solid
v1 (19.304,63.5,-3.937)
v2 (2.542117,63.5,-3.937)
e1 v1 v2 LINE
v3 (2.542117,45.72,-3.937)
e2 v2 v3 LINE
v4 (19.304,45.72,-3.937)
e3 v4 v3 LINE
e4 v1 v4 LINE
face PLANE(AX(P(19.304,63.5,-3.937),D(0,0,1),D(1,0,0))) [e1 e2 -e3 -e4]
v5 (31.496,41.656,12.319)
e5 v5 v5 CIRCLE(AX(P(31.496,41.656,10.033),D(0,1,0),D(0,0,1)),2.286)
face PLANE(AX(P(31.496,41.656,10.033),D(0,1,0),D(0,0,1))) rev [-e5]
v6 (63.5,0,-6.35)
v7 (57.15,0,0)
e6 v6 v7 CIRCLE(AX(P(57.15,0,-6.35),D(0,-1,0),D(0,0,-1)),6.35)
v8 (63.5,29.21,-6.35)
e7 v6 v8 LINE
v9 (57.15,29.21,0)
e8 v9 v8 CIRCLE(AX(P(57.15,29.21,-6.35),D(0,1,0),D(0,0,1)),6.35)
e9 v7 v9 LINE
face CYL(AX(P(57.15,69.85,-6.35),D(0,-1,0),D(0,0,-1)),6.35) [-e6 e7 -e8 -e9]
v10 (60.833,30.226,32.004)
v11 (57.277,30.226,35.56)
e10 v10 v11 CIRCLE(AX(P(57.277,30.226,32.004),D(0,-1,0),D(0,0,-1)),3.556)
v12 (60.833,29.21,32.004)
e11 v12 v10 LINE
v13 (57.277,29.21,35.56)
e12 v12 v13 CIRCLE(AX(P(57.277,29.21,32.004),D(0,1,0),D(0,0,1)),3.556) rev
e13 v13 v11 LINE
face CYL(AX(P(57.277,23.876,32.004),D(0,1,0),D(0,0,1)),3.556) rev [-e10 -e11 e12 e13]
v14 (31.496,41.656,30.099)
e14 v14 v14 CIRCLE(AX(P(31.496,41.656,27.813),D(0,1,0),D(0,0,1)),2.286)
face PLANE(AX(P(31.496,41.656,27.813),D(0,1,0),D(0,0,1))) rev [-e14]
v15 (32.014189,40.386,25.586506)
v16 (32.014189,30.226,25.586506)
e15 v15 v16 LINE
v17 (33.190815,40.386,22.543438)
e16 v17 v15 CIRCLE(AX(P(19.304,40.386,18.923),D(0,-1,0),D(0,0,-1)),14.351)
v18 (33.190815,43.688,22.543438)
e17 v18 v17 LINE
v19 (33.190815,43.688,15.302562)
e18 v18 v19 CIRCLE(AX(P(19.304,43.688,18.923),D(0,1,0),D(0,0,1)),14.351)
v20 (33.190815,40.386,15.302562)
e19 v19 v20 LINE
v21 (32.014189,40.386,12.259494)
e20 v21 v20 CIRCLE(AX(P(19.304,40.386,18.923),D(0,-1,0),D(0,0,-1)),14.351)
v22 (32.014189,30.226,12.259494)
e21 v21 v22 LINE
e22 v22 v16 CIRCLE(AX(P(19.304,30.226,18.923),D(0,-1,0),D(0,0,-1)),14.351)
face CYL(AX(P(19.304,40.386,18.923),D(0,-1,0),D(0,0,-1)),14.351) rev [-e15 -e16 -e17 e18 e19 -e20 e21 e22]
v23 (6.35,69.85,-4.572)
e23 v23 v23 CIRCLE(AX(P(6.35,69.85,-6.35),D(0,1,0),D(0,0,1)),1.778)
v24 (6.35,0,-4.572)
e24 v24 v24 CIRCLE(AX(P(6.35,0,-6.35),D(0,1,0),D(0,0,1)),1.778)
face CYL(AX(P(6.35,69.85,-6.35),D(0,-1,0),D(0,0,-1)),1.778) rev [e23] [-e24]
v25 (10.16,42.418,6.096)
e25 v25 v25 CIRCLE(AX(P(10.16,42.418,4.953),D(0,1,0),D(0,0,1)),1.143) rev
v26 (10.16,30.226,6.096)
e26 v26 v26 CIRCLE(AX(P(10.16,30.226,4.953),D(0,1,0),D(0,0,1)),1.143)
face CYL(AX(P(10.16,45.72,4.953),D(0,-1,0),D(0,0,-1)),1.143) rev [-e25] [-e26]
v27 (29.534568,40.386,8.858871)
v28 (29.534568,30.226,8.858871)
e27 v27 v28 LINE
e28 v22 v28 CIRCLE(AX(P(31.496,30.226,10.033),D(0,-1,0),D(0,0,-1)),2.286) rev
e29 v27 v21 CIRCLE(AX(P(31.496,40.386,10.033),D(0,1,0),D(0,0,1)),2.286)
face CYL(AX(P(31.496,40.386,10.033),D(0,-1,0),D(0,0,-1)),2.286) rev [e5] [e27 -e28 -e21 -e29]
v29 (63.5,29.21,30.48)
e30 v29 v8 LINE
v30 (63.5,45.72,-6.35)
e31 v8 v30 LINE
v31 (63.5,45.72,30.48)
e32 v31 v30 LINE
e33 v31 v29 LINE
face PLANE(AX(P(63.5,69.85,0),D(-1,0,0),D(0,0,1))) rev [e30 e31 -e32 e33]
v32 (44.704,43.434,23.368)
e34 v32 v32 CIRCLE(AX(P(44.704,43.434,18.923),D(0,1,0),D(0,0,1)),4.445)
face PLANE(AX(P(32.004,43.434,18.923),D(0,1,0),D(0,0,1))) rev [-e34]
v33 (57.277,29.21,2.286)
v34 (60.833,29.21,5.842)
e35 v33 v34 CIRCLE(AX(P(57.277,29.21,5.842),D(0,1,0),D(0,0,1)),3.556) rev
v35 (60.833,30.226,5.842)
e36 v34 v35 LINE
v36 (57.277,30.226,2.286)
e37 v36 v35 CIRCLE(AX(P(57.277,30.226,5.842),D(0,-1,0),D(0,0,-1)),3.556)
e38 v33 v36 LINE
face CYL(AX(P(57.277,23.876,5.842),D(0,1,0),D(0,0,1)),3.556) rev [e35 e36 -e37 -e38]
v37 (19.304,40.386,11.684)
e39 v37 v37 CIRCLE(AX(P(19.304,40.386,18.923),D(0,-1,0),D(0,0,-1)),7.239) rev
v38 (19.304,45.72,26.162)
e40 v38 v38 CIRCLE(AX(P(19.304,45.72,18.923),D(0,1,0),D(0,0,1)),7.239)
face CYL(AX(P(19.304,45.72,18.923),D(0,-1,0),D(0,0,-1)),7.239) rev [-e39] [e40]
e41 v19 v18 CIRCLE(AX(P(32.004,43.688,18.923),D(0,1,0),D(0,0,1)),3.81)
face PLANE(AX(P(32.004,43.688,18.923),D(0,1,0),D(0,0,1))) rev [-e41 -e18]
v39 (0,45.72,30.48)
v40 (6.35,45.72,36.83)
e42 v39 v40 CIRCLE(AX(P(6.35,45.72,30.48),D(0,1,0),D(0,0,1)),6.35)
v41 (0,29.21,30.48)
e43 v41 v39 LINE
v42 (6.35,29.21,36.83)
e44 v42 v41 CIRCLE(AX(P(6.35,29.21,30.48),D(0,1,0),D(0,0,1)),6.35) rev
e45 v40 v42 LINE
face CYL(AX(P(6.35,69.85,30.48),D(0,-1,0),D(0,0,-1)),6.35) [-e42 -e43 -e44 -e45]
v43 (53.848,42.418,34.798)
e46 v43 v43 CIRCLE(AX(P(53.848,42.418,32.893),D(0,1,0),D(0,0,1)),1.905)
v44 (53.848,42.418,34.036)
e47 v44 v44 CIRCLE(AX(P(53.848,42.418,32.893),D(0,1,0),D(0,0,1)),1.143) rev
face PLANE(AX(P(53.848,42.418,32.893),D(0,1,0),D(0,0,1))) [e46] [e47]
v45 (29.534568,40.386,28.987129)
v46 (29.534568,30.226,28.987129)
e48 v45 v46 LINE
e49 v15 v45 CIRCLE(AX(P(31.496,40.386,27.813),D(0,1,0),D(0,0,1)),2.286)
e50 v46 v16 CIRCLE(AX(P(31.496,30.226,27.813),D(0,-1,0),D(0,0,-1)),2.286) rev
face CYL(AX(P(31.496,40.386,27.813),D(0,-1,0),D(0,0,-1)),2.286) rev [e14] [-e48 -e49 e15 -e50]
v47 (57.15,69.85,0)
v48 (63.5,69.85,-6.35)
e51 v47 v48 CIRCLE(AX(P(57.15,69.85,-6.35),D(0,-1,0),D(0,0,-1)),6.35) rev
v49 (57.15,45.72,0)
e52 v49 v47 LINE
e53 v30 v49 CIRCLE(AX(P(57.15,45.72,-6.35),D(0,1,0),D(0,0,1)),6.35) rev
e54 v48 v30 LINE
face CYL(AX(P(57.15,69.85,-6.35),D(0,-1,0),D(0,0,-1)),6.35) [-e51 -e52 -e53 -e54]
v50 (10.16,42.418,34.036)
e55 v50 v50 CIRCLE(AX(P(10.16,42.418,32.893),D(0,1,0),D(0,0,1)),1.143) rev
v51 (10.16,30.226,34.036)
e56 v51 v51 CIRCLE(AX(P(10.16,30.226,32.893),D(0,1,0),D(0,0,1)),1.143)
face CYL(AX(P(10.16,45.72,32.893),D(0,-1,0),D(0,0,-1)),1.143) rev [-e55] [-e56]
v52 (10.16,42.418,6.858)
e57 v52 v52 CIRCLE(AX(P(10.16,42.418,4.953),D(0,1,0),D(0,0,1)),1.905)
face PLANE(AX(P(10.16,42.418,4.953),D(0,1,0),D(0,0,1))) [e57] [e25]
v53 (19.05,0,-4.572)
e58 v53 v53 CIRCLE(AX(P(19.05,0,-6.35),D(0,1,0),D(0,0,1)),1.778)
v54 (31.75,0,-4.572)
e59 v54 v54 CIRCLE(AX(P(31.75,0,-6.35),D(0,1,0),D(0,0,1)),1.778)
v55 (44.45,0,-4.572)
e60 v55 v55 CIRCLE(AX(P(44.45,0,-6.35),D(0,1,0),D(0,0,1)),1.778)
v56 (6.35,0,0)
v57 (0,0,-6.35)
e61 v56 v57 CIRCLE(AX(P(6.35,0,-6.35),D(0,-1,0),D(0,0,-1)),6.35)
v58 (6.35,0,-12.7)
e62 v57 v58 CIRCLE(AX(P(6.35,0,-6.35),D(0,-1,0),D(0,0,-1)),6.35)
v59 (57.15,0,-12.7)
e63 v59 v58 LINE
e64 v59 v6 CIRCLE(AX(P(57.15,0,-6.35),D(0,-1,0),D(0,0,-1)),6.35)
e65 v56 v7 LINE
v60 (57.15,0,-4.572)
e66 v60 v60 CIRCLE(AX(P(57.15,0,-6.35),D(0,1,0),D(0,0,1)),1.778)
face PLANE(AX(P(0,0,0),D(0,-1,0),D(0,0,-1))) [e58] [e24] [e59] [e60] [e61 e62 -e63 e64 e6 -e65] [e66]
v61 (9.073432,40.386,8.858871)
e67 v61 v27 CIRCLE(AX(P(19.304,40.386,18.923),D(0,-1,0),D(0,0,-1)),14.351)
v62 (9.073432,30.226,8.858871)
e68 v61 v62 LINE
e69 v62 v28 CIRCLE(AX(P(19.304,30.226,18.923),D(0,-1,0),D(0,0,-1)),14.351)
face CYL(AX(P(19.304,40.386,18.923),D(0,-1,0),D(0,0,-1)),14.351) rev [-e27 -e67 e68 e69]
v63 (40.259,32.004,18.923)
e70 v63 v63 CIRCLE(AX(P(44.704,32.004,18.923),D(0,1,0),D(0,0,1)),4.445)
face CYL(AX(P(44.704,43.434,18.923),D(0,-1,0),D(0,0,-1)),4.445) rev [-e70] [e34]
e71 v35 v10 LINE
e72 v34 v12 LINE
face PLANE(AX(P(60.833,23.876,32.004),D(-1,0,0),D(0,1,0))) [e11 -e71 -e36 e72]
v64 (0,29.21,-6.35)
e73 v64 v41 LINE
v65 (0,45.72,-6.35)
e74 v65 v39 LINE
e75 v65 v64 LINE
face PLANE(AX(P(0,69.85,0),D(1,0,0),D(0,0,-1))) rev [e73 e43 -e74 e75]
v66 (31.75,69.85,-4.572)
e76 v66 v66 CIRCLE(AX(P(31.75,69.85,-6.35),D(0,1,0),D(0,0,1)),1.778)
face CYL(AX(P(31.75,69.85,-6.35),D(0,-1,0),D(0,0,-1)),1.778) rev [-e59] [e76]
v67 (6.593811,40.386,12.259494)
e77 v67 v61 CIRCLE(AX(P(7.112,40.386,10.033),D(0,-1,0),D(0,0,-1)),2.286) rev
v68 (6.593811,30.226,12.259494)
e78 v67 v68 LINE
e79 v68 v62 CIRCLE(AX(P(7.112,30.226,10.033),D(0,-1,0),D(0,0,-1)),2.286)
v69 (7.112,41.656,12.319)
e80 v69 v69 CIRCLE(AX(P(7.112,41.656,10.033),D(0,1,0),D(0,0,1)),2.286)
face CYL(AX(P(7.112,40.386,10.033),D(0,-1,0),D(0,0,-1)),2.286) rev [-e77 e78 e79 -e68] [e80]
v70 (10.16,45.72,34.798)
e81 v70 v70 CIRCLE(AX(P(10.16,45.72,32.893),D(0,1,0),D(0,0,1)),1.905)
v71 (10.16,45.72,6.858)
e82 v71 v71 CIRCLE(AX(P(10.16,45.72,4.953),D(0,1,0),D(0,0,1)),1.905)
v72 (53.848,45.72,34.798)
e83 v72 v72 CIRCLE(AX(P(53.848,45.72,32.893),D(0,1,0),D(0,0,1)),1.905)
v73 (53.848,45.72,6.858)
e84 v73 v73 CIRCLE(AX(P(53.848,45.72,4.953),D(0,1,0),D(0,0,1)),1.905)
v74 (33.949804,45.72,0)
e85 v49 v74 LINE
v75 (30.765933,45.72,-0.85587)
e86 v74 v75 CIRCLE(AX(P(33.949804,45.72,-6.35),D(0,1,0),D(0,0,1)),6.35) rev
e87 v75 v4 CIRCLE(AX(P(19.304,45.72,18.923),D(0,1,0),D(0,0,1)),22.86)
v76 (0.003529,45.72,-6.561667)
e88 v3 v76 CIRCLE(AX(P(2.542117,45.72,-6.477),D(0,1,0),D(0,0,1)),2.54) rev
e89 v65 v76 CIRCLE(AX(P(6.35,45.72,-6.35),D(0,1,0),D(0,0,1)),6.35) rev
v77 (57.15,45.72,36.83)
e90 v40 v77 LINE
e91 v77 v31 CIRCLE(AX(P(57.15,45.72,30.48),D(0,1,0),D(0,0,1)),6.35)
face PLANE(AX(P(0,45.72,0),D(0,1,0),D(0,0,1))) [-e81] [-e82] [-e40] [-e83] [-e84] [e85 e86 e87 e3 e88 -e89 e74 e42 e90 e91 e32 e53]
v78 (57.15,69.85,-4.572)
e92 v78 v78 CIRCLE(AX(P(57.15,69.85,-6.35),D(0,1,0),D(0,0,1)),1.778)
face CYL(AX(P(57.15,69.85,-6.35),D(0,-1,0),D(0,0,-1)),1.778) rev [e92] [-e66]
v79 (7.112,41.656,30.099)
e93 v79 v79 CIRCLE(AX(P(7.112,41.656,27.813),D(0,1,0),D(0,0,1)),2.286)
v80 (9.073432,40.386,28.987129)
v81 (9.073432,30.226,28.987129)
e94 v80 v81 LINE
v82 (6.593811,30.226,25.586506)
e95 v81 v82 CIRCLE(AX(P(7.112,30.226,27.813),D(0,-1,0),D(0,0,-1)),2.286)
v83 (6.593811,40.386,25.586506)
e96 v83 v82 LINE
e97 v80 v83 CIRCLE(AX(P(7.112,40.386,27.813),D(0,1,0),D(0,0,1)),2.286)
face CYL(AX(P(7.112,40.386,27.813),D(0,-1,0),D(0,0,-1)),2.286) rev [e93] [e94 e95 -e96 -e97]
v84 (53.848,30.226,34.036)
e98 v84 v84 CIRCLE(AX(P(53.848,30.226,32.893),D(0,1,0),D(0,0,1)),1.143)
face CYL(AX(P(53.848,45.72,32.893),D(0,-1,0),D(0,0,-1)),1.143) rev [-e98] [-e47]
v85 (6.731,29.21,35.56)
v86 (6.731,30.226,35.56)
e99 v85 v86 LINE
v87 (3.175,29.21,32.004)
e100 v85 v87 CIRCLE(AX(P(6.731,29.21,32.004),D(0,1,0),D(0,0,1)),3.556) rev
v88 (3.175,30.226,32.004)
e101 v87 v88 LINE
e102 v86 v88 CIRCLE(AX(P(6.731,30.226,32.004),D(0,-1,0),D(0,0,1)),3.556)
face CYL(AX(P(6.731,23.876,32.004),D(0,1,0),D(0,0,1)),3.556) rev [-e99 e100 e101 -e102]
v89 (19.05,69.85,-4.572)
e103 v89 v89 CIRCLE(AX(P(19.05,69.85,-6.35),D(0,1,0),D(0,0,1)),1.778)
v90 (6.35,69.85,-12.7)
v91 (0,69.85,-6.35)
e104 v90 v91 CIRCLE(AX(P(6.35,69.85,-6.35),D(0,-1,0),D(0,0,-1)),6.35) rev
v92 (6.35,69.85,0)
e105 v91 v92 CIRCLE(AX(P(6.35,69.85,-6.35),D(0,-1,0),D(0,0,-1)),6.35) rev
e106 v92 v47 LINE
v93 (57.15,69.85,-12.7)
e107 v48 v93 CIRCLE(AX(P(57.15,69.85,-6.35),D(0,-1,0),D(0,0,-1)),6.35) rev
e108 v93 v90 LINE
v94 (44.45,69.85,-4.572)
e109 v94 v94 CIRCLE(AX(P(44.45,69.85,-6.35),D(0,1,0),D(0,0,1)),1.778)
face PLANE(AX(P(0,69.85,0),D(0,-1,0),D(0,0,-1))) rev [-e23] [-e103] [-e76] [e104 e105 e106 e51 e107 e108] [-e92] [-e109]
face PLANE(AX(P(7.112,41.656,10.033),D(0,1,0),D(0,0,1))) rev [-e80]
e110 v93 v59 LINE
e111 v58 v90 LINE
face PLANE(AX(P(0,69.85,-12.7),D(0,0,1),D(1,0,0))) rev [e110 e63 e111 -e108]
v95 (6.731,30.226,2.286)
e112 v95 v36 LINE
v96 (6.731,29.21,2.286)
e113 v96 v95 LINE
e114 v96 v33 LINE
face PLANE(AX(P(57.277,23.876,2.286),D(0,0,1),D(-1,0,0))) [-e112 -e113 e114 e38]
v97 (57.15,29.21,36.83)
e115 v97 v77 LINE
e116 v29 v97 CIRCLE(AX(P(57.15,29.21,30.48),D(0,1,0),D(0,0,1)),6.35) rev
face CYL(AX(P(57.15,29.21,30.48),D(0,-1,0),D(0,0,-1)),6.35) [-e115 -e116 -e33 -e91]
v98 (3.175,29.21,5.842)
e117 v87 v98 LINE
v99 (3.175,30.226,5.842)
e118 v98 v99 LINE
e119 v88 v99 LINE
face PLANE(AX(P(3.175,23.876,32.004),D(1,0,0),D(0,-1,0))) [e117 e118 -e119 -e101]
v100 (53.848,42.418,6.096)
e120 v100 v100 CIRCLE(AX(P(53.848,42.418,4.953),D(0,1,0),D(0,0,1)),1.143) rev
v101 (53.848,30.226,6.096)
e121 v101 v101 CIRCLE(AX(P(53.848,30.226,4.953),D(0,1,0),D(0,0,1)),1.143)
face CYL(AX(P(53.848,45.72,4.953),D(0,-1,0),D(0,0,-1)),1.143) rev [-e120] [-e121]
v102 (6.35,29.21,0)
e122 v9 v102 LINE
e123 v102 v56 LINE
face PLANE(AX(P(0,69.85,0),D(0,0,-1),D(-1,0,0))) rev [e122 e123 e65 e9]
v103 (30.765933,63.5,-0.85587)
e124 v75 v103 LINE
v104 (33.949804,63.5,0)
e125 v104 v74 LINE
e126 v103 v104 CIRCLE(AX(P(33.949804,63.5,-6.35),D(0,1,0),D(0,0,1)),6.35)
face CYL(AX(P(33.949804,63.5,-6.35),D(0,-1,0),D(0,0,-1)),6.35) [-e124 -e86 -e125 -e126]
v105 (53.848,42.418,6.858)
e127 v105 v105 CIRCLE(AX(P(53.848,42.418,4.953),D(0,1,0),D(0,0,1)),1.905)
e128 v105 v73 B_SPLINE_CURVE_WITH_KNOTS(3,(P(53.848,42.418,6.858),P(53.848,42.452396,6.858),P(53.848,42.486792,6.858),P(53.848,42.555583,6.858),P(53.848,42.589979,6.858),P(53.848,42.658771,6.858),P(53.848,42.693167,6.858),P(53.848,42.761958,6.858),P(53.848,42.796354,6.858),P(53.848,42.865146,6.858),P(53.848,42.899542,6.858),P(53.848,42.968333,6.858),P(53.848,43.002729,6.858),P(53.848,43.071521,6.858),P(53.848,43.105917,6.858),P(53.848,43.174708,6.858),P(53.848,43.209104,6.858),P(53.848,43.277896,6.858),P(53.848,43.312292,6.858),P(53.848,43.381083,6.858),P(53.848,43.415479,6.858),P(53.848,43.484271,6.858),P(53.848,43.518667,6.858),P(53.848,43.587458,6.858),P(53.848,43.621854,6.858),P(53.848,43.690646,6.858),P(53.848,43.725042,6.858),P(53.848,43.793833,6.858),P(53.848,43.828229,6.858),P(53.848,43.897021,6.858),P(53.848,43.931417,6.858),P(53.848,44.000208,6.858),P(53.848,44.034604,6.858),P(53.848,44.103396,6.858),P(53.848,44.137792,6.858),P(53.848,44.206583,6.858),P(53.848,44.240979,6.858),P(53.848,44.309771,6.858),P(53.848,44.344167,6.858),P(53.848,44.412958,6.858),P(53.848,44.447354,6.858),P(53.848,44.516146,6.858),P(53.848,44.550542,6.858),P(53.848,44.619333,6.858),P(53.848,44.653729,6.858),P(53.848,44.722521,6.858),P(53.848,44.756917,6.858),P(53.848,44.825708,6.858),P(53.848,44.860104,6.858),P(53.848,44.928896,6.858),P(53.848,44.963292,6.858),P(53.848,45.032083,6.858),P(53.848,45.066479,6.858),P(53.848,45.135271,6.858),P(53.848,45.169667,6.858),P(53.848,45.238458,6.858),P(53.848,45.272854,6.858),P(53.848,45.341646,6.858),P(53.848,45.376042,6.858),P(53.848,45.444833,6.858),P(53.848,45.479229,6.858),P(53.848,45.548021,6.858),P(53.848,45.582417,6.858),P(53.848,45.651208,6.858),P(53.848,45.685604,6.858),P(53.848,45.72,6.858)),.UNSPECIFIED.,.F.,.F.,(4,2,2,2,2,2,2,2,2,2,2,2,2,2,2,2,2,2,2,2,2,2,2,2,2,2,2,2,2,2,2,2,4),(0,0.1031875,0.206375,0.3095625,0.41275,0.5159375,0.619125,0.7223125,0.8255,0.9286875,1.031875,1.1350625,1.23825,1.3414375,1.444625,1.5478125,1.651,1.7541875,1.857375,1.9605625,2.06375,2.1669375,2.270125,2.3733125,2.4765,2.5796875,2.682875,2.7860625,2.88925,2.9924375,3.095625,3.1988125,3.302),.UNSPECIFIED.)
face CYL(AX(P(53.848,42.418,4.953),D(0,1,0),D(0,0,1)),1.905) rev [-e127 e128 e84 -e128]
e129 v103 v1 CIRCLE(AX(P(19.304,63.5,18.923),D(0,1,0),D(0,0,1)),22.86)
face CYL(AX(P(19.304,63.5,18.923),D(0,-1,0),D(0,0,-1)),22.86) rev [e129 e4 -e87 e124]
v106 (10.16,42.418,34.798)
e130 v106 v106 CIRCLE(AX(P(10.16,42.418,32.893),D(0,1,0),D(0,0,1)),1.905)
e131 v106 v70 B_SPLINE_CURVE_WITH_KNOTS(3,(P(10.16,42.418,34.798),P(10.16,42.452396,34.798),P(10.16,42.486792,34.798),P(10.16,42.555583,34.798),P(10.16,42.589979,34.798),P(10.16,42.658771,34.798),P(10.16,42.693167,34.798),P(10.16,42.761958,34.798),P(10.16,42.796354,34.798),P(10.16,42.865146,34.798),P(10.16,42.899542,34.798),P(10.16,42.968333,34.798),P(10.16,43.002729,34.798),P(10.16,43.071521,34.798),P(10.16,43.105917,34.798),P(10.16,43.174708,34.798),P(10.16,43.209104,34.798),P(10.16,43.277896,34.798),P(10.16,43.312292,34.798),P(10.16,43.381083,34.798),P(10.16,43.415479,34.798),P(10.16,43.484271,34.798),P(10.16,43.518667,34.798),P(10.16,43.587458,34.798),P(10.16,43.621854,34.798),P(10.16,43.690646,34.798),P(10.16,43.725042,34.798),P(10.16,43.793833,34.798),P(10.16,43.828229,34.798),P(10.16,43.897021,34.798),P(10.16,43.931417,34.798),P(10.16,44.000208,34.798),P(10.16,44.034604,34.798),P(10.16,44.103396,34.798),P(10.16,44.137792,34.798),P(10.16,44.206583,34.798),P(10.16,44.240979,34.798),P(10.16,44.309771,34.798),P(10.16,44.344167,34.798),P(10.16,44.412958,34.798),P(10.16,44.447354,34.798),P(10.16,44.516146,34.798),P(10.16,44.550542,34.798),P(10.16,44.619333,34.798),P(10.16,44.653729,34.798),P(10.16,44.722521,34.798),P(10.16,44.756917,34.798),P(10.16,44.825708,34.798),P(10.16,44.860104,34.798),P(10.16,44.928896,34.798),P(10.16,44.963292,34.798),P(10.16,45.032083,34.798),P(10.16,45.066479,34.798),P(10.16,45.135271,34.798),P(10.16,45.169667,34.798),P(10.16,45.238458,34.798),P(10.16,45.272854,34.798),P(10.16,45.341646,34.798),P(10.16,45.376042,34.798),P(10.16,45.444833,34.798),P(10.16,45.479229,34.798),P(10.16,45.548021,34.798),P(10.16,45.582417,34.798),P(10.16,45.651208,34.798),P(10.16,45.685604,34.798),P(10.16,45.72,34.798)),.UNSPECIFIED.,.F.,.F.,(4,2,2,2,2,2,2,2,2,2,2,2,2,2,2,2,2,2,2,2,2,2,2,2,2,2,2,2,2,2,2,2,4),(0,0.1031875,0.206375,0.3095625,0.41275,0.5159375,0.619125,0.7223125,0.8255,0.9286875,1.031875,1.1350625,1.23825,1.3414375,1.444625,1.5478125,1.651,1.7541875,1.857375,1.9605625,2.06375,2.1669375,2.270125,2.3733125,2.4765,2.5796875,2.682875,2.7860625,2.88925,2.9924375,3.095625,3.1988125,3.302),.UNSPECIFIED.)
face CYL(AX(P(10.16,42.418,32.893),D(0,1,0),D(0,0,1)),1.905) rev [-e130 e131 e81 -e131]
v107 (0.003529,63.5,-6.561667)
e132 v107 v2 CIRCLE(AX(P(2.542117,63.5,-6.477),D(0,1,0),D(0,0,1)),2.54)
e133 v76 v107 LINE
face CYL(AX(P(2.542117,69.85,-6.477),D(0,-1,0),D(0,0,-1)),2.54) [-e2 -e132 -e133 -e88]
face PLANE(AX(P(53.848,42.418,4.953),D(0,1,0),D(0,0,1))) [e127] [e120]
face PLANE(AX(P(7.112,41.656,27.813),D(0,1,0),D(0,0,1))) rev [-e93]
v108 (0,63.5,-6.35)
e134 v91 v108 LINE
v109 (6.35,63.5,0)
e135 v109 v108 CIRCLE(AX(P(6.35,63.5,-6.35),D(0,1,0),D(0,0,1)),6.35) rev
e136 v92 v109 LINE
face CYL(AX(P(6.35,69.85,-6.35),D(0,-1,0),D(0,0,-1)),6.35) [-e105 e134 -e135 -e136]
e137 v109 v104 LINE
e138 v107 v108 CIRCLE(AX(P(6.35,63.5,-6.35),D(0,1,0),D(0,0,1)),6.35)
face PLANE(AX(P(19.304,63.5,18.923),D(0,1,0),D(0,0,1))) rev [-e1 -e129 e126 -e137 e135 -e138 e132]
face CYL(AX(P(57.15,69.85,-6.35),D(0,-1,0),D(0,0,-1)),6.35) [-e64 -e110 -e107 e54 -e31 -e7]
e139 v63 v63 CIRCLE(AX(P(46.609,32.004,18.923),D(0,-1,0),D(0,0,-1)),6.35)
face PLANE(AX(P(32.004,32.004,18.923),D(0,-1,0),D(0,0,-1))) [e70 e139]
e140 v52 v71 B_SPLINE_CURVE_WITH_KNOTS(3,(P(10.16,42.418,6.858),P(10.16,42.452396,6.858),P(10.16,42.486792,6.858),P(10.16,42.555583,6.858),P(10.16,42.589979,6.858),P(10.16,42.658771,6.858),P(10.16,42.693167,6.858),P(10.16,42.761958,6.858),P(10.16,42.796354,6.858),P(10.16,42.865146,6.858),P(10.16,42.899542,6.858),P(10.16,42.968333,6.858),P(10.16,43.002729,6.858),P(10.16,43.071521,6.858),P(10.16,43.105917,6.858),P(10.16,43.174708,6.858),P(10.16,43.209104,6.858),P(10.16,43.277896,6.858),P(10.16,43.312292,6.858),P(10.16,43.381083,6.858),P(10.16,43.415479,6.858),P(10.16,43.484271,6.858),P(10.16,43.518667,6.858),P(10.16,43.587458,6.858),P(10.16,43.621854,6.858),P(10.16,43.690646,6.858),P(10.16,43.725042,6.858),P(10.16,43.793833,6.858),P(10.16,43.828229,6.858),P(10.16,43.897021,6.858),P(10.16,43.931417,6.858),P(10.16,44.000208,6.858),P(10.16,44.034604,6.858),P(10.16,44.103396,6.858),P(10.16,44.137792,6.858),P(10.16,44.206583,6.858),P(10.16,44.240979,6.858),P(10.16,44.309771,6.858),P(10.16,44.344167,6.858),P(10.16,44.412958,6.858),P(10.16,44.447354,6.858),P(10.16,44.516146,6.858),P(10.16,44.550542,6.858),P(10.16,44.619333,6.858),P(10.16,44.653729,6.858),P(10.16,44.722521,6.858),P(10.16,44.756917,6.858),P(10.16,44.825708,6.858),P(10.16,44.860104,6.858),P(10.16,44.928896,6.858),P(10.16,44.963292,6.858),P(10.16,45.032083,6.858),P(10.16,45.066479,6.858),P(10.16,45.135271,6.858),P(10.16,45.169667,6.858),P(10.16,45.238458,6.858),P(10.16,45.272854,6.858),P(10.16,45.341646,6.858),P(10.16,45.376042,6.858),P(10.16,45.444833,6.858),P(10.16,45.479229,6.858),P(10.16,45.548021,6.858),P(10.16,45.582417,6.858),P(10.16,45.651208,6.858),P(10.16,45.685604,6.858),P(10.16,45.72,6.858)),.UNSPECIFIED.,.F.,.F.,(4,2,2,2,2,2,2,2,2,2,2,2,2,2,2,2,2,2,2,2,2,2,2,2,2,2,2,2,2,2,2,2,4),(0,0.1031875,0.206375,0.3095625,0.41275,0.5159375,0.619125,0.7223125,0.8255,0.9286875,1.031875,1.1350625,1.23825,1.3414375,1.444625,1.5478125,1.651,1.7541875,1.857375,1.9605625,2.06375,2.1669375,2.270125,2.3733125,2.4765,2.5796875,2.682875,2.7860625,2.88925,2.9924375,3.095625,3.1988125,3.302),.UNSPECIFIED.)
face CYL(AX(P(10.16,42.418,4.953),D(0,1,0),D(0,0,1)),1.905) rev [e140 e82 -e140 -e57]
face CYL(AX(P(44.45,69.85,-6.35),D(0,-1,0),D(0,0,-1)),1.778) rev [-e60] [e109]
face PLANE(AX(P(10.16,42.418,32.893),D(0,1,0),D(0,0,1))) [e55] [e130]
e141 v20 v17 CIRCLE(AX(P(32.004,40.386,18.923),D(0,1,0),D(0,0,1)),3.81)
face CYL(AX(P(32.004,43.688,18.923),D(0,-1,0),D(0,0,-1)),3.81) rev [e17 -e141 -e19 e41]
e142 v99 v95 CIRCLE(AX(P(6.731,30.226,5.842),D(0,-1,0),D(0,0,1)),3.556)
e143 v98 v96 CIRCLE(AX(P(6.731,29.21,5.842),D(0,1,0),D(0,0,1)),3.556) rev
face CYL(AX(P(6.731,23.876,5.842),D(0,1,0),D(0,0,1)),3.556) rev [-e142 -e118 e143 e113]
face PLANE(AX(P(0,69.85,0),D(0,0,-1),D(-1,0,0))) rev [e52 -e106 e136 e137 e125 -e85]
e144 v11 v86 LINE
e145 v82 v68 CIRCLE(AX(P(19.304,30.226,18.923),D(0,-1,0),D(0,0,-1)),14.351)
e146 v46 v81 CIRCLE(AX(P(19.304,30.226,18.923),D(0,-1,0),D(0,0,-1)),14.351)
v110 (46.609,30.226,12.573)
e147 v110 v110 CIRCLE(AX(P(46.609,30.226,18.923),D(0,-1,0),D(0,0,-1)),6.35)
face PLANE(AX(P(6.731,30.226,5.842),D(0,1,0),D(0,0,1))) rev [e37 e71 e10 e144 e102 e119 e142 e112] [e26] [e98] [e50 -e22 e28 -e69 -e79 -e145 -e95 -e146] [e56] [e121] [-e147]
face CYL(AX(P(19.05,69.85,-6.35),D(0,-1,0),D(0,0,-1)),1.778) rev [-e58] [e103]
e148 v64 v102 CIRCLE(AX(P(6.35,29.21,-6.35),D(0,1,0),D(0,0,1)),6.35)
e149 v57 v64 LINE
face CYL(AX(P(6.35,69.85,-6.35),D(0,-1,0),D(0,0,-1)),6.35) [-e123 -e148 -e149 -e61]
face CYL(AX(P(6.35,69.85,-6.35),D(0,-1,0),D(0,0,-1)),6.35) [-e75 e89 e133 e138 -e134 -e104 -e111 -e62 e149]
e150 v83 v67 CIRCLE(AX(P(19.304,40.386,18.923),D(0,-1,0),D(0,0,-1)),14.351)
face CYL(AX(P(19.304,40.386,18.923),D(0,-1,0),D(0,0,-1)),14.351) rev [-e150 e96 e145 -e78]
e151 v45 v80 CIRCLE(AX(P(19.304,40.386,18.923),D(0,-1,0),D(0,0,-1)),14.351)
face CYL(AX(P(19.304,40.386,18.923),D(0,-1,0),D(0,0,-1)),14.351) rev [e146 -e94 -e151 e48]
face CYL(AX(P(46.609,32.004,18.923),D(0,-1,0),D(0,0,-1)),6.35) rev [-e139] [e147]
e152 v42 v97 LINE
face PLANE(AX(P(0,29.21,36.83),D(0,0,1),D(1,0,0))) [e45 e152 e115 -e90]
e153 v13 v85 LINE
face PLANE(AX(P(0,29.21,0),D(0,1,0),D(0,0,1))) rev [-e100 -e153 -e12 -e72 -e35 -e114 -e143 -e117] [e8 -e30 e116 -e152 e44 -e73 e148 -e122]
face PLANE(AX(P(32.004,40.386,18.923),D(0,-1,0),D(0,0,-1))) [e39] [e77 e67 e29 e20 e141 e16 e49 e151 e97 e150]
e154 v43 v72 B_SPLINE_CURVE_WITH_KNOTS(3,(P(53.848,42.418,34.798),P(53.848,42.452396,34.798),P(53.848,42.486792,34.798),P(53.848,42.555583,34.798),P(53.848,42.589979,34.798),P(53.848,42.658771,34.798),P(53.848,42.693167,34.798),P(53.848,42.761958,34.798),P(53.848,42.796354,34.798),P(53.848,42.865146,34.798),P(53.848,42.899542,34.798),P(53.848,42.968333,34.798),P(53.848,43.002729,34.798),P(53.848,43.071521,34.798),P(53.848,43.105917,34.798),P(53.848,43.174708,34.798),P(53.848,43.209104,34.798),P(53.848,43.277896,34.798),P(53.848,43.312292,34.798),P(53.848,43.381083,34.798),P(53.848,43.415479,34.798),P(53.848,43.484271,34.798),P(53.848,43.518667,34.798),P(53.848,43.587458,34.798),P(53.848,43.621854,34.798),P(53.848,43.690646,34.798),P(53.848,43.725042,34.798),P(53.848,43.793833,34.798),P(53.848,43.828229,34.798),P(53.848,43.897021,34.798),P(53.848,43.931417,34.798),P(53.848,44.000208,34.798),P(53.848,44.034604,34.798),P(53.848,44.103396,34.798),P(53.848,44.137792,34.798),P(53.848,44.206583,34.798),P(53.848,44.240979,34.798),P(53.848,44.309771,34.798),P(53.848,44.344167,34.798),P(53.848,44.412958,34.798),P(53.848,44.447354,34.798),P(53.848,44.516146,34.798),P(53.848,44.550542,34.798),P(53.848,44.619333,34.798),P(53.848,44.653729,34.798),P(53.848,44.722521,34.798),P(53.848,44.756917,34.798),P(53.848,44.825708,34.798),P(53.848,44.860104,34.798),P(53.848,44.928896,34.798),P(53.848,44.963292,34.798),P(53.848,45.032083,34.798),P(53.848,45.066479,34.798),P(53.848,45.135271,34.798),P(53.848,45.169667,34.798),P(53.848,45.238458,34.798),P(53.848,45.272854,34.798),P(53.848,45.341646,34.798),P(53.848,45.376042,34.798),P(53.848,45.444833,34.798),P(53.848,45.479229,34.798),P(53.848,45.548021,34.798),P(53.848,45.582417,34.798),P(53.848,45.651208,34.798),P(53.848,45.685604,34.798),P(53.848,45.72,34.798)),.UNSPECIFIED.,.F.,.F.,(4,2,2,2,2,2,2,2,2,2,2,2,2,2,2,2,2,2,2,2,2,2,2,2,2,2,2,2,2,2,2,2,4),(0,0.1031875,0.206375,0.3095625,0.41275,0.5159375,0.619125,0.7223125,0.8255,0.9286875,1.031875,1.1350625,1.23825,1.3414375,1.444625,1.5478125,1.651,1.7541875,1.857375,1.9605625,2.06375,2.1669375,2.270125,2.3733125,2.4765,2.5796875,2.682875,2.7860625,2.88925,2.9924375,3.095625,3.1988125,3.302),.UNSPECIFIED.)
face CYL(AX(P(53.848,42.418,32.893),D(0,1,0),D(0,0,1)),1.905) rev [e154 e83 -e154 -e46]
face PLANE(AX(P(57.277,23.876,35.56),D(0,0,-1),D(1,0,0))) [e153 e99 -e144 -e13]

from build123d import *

# Parameters (mm, degrees)
SKETCH1_W             = 63.5
SKETCH1_H             = 12.7
SKETCH1_R             = 1.778
BOSS_EXTRUDE1_DEPTH   = 69.85
SKETCH2_W             = 63.5
SKETCH2_H             = 36.83
BOSS_EXTRUDE2_DEPTH   = 16.51
CAVITY1_START         = 29.21
CAVITY1_OUTLINE_R     = 1.143
CAVITY1_OUTLINE_R_2   = 4.445
CAVITY1_DEPTH         = 11.176
CAVITY1_2_OUTLINE_R   = 1.143
CAVITY1_2_OUTLINE_R_2 = 4.445
CAVITY1_2_DEPTH       = 1.016
CAVITY1_START_2       = 40.386
CAVITY1_3_OUTLINE_R   = 1.143
CAVITY1_3_OUTLINE_R_2 = 7.239
CAVITY1_3_DEPTH       = 5.334
CAVITY1_4_OUTLINE_R   = 4.445
CAVITY1_4_DEPTH       = 3.048
CAVITY1_START_3       = 30.226
CAVITY1_5_DEPTH       = 1.778
CAVITY1_START_4       = 42.418
CAVITY1_6_OUTLINE_R   = 1.905
CAVITY1_6_OUTLINE_R_2 = 1.143
CAVITY1_6_DEPTH       = 3.302
CAVITY1_7_OUTLINE_R   = 2.286
CAVITY1_7_DEPTH       = 1.27
CAVITY1_START_5       = 43.434
CAVITY1_8_DEPTH       = 0.254
CUT_EXTRUDE1_DEPTH    = 17.78
FILLET1_START         = -1
FILLET1_DEPTH         = 72
FILLET1_2_DEPTH       = 30.21
FILLET1_START_2       = 45.72
FILLET1_3_DEPTH       = 25.28
FILLET1_4_DEPTH       = 17.78
FILLET2_R             = 2.54


with BuildPart() as part:
    # Sketch1 → Boss-Extrude1 (new body)
    with BuildSketch(Plane(origin=(0, 0, 0), x_dir=(1, 0, 0), z_dir=(0, 1, 0))):
        with Locations((31.75, 6.35)):
            Rectangle(SKETCH1_W, SKETCH1_H)
        with Locations(Location((6.35, 6.35, 0), (0, 0, 270))):
            Circle(SKETCH1_R, mode=Mode.SUBTRACT)
        with Locations(Location((19.05, 6.35, 0), (0, 0, 270))):
            Circle(SKETCH1_R, mode=Mode.SUBTRACT)
        with Locations(Location((31.75, 6.35, 0), (0, 0, 270))):
            Circle(SKETCH1_R, mode=Mode.SUBTRACT)
        with Locations(Location((44.45, 6.35, 0), (0, 0, 270))):
            Circle(SKETCH1_R, mode=Mode.SUBTRACT)
        with Locations(Location((57.15, 6.35, 0), (0, 0, 270))):
            Circle(SKETCH1_R, mode=Mode.SUBTRACT)
    extrude(amount=BOSS_EXTRUDE1_DEPTH)

    # Sketch2 → Boss-Extrude2 (add)
    with BuildSketch(Plane(origin=(0, 45.72, 0), x_dir=(1, 0, 0), z_dir=(0, 1, 0))):
        with Locations((31.75, -18.415)):
            Rectangle(SKETCH2_W, SKETCH2_H)
    extrude(amount=-BOSS_EXTRUDE2_DEPTH)

    # Cavity1: read off the stored shape, not the designer's step
    # Cavity1 outline → Cavity1 (cut)
    with BuildSketch(Plane(origin=(0, 0, 0), x_dir=(1, 0, 0), z_dir=(0, 1, 0)).offset(CAVITY1_START)):
        with BuildLine():
            ThreePointArc((6.593811482, -12.259494253), (4.953, -18.923), (6.593811482, -25.586505747))
            ThreePointArc((6.593811482, -25.586505747), (5.264894786, -29.159847552), (9.073432496, -28.987128852))
            ThreePointArc((9.073432496, -28.987128852), (19.304, -33.274), (29.534567504, -28.987128852))
            ThreePointArc((29.534567504, -28.987128852), (33.343105214, -29.159847552), (32.014188518, -25.586505747))
            ThreePointArc((32.014188518, -25.586505747), (33.655, -18.923), (32.014188518, -12.259494253))
            ThreePointArc((32.014188518, -12.259494253), (33.343105214, -8.686152448), (29.534567504, -8.858871148))
            ThreePointArc((29.534567504, -8.858871148), (19.304, -4.572), (9.073432496, -8.858871148))
            ThreePointArc((9.073432496, -8.858871148), (5.264894786, -8.686152448), (6.593811482, -12.259494253))
        make_face()
        with Locations((10.16, -4.953)):
            Circle(CAVITY1_OUTLINE_R)
        with Locations((53.848, -4.953)):
            Circle(CAVITY1_OUTLINE_R)
        with Locations((10.16, -32.893)):
            Circle(CAVITY1_OUTLINE_R)
        with Locations((44.704, -18.923)):
            Circle(CAVITY1_OUTLINE_R_2)
        with Locations((53.848, -32.893)):
            Circle(CAVITY1_OUTLINE_R)
    extrude(amount=CAVITY1_DEPTH, mode=Mode.SUBTRACT)

    # Cavity1 2 outline → Cavity1 2 (cut)
    with BuildSketch(Plane(origin=(0, 0, 0), x_dir=(1, 0, 0), z_dir=(0, 1, 0)).offset(CAVITY1_START)):
        with BuildLine():
            ThreePointArc((6.731, -2.286), (4.216528286, -3.327528286), (3.175, -5.842))
            Line((3.175, -5.842), (3.175, -32.004))
            ThreePointArc((3.175, -32.004), (4.216528286, -34.518471714), (6.731, -35.56))
            Line((6.731, -35.56), (57.277, -35.56))
            ThreePointArc((57.277, -35.56), (59.791471714, -34.518471714), (60.833, -32.004))
            Line((60.833, -32.004), (60.833, -5.842))
            ThreePointArc((60.833, -5.842), (59.791471714, -3.327528286), (57.277, -2.286))
            Line((57.277, -2.286), (6.731, -2.286))
        make_face()
        with BuildLine():
            ThreePointArc((9.073432496, -8.858871148), (19.304, -4.572), (29.534567504, -8.858871148))
            ThreePointArc((29.534567504, -8.858871148), (33.343105214, -8.686152448), (32.014188518, -12.259494253))
            ThreePointArc((32.014188518, -12.259494253), (33.655, -18.923), (32.014188518, -25.586505747))
            ThreePointArc((32.014188518, -25.586505747), (33.343105214, -29.159847552), (29.534567504, -28.987128852))
            ThreePointArc((29.534567504, -28.987128852), (19.304, -33.274), (9.073432496, -28.987128852))
            ThreePointArc((9.073432496, -28.987128852), (5.264894786, -29.159847552), (6.593811482, -25.586505747))
            ThreePointArc((6.593811482, -25.586505747), (4.953, -18.923), (6.593811482, -12.259494253))
            ThreePointArc((6.593811482, -12.259494253), (5.264894786, -8.686152448), (9.073432496, -8.858871148))
        make_face(mode=Mode.SUBTRACT)
        with Locations((10.16, -4.953)):
            Circle(CAVITY1_2_OUTLINE_R, mode=Mode.SUBTRACT)
        with Locations((53.848, -4.953)):
            Circle(CAVITY1_2_OUTLINE_R, mode=Mode.SUBTRACT)
        with Locations((44.704, -18.923)):
            Circle(CAVITY1_2_OUTLINE_R_2, mode=Mode.SUBTRACT)
        with Locations((10.16, -32.893)):
            Circle(CAVITY1_2_OUTLINE_R, mode=Mode.SUBTRACT)
        with Locations((53.848, -32.893)):
            Circle(CAVITY1_2_OUTLINE_R, mode=Mode.SUBTRACT)
    extrude(amount=CAVITY1_2_DEPTH, mode=Mode.SUBTRACT)

    # Cavity1 3 outline → Cavity1 3 (cut)
    with BuildSketch(Plane(origin=(0, 0, 0), x_dir=(1, 0, 0), z_dir=(0, 1, 0)).offset(CAVITY1_START_2)):
        with Locations((10.16, -4.953)):
            Circle(CAVITY1_3_OUTLINE_R)
        with Locations((53.848, -4.953)):
            Circle(CAVITY1_3_OUTLINE_R)
        with Locations((10.16, -32.893)):
            Circle(CAVITY1_3_OUTLINE_R)
        with Locations((53.848, -32.893)):
            Circle(CAVITY1_3_OUTLINE_R)
        with Locations((19.304, -18.923)):
            Circle(CAVITY1_3_OUTLINE_R_2)
    extrude(amount=CAVITY1_3_DEPTH, mode=Mode.SUBTRACT)

    # Cavity1 4 outline → Cavity1 4 (cut)
    with BuildSketch(Plane(origin=(0, 0, 0), x_dir=(1, 0, 0), z_dir=(0, 1, 0)).offset(CAVITY1_START_2)):
        with BuildLine():
            ThreePointArc((33.190815, -22.54343784), (33.655, -18.923), (33.190815, -15.30256216))
            ThreePointArc((33.190815, -15.30256216), (28.194, -18.923), (33.190815, -22.54343784))
        make_face()
        with Locations((44.704, -18.923)):
            Circle(CAVITY1_4_OUTLINE_R)
    extrude(amount=CAVITY1_4_DEPTH, mode=Mode.SUBTRACT)

    # Cavity1 5 outline → Cavity1 5 (cut)
    with BuildSketch(Plane(origin=(0, 0, 0), x_dir=(1, 0, 0), z_dir=(0, 1, 0)).offset(CAVITY1_START_3)):
        with BuildLine():
            Line((43.693058667, -14.594487251), (45.602725966, -12.653238237))
            ThreePointArc((45.602725966, -12.653238237), (42.21166679, -14.341956381), (40.385648336, -17.661099029))
            Line((40.385648336, -17.661099029), (40.436941907, -17.677913564))
            ThreePointArc((40.436941907, -17.677913564), (41.647662495, -15.695489185), (43.693058667, -14.594487251))
        make_face()
        with BuildLine():
            ThreePointArc((52.371669641, -16.255765737), (49.592349777, -13.317455949), (45.602725966, -12.653238237))
            Line((45.602725966, -12.653238237), (43.693058667, -14.594487251))
            ThreePointArc((43.693058667, -14.594487251), (46.8188806, -15.013357427), (48.880068942, -17.40034666))
            Line((48.880068942, -17.40034666), (52.371669641, -16.255765737))
        make_face()
        with BuildLine():
            ThreePointArc((52.959, -18.923), (52.81042936, -17.557432759), (52.371669641, -16.255765737))
            Line((52.371669641, -16.255765737), (48.880068942, -17.40034666))
            ThreePointArc((48.880068942, -17.40034666), (49.081250932, -18.149889868), (49.149, -18.923))
            ThreePointArc((49.149, -18.923), (49.081250932, -19.696110132), (48.880068942, -20.44565334))
            Line((48.880068942, -20.44565334), (52.371669641, -21.590234263))
            ThreePointArc((52.371669641, -21.590234263), (52.81042936, -20.288567241), (52.959, -18.923))
        make_face()
        with BuildLine():
            Line((40.436941907, -17.677913564), (40.385648336, -17.661099029))
            ThreePointArc((40.385648336, -17.661099029), (40.35204351, -17.839950842), (40.323577582, -18.019692174))
            Line((40.323577582, -18.019692174), (40.359488936, -17.983186925))
            ThreePointArc((40.359488936, -17.983186925), (40.395510846, -17.829864048), (40.436941907, -17.677913564))
        make_face()
        with BuildLine():
            ThreePointArc((45.602725967, -25.192761763), (49.592349777, -24.528544051), (52.371669641, -21.590234263))
            Line((52.371669641, -21.590234263), (48.880068942, -20.44565334))
            ThreePointArc((48.880068942, -20.44565334), (46.8188806, -22.832642573), (43.693058668, -23.25151275))
            Line((43.693058668, -23.25151275), (45.602725967, -25.192761763))
        make_face()
        with BuildLine():
            Line((40.359488936, -17.983186925), (40.323577582, -18.019692174))
            ThreePointArc((40.323577582, -18.019692174), (40.275164971, -18.470193393), (40.259, -18.923))
            ThreePointArc((40.259, -18.923), (40.284193631, -18.450414917), (40.359488936, -17.983186925))
        make_face()
        with BuildLine():
            Line((40.359488936, -19.862813075), (40.323577582, -19.826307826))
            ThreePointArc((40.323577582, -19.826307826), (40.35204351, -20.006049158), (40.385648336, -20.184900971))
            Line((40.385648336, -20.184900971), (40.436941907, -20.168086436))
            ThreePointArc((40.436941907, -20.168086436), (40.395510846, -20.016135951), (40.359488936, -19.862813075))
        make_face()
        with BuildLine():
            ThreePointArc((40.259, -18.923), (40.275164971, -19.375806607), (40.323577582, -19.826307826))
            Line((40.323577582, -19.826307826), (40.359488936, -19.862813075))
            ThreePointArc((40.359488936, -19.862813075), (40.284193631, -19.395585083), (40.259, -18.923))
        make_face()
        with BuildLine():
            ThreePointArc((40.385648336, -20.184900971), (42.21166679, -23.504043619), (45.602725967, -25.192761763))
            Line((45.602725967, -25.192761763), (43.693058668, -23.25151275))
            ThreePointArc((43.693058668, -23.25151275), (41.647662496, -22.150510815), (40.436941907, -20.168086436))
            Line((40.436941907, -20.168086436), (40.385648336, -20.184900971))
        make_face()
    extrude(amount=CAVITY1_5_DEPTH, mode=Mode.SUBTRACT)

    # Cavity1 6 outline → Cavity1 6 (cut)
    # profile 1 of 4: a face of its own
    with BuildSketch(Plane(origin=(0, 0, 0), x_dir=(1, 0, 0), z_dir=(0, 1, 0)).offset(CAVITY1_START_4)):
        with Locations((10.16, -4.953)):
            Circle(CAVITY1_6_OUTLINE_R)
        with Locations((10.16, -4.953)):
            Circle(CAVITY1_6_OUTLINE_R_2, mode=Mode.SUBTRACT)
    # profile 2 of 4: a face of its own
    with BuildSketch(Plane(origin=(0, 0, 0), x_dir=(1, 0, 0), z_dir=(0, 1, 0)).offset(CAVITY1_START_4)):
        with Locations((53.848, -4.953)):
            Circle(CAVITY1_6_OUTLINE_R)
        with Locations((53.848, -4.953)):
            Circle(CAVITY1_6_OUTLINE_R_2, mode=Mode.SUBTRACT)
    # profile 3 of 4: a face of its own
    with BuildSketch(Plane(origin=(0, 0, 0), x_dir=(1, 0, 0), z_dir=(0, 1, 0)).offset(CAVITY1_START_4)):
        with Locations((10.16, -32.893)):
            Circle(CAVITY1_6_OUTLINE_R)
        with Locations((10.16, -32.893)):
            Circle(CAVITY1_6_OUTLINE_R_2, mode=Mode.SUBTRACT)
    # profile 4 of 4: a face of its own
    with BuildSketch(Plane(origin=(0, 0, 0), x_dir=(1, 0, 0), z_dir=(0, 1, 0)).offset(CAVITY1_START_4)):
        with Locations((53.848, -32.893)):
            Circle(CAVITY1_6_OUTLINE_R)
        with Locations((53.848, -32.893)):
            Circle(CAVITY1_6_OUTLINE_R_2, mode=Mode.SUBTRACT)
    extrude(amount=CAVITY1_6_DEPTH, mode=Mode.SUBTRACT)

    # Cavity1 7 outline → Cavity1 7 (cut)
    with BuildSketch(Plane(origin=(0, 0, 0), x_dir=(1, 0, 0), z_dir=(0, 1, 0)).offset(CAVITY1_START_2)):
        with Locations((7.112, -10.033)):
            Circle(CAVITY1_7_OUTLINE_R)
        with Locations((31.496, -10.033)):
            Circle(CAVITY1_7_OUTLINE_R)
        with Locations((7.112, -27.813)):
            Circle(CAVITY1_7_OUTLINE_R)
        with Locations((31.496, -27.813)):
            Circle(CAVITY1_7_OUTLINE_R)
    extrude(amount=CAVITY1_7_DEPTH, mode=Mode.SUBTRACT)

    # Cavity1 8 outline → Cavity1 8 (cut)
    with BuildSketch(Plane(origin=(0, 0, 0), x_dir=(1, 0, 0), z_dir=(0, 1, 0)).offset(CAVITY1_START_5)):
        with BuildLine():
            ThreePointArc((33.190815, -22.54343784), (33.655, -18.923), (33.190815, -15.30256216))
            ThreePointArc((33.190815, -15.30256216), (28.194, -18.923), (33.190815, -22.54343784))
        make_face()
    extrude(amount=CAVITY1_8_DEPTH, mode=Mode.SUBTRACT)

    # Sketch3 → Cut-Extrude1 (cut)
    with BuildSketch(Plane(origin=(0, 45.72, 0), x_dir=(1, 0, 0), z_dir=(0, 1, 0))):
        with BuildLine():
            Line((19.304, 3.937), (0, 3.937))
            Line((0, 3.937), (0, -6.678197674))
            ThreePointArc((0, -6.678197674), (30.319067381, -38.954172971), (19.304, 3.937))
        make_face()
    extrude(amount=CUT_EXTRUDE1_DEPTH, mode=Mode.SUBTRACT)

    # Fillet1: read off the stored shape, not the designer's step
    # Fillet1 outline → Fillet1 (cut)
    with BuildSketch(Plane(origin=(0, 0, 0), x_dir=(1, 0, 0), z_dir=(0, 1, 0)).offset(FILLET1_START)):
        with BuildLine():
            Line((0, 12.7), (0, 6.35))
            ThreePointArc((0, 6.35), (1.859871939, 10.840128061), (6.35, 12.7))
            Line((6.35, 12.7), (0, 12.7))
        make_face()
        with BuildLine():
            ThreePointArc((6.35, -36.83), (1.859871939, -34.970128061), (0, -30.48))
            Line((0, -30.48), (0, -36.83))
            Line((0, -36.83), (6.35, -36.83))
        make_face()
        with BuildLine():
            Line((63.5, 12.7), (57.15, 12.7))
            ThreePointArc((57.15, 12.7), (61.640128061, 10.840128061), (63.5, 6.35))
            Line((63.5, 6.35), (63.5, 12.7))
        make_face()
        with BuildLine():
            ThreePointArc((63.5, -30.48), (61.640128061, -34.970128061), (57.15, -36.83))
            Line((57.15, -36.83), (63.5, -36.83))
            Line((63.5, -36.83), (63.5, -30.48))
        make_face()
    extrude(amount=FILLET1_DEPTH, mode=Mode.SUBTRACT)

    # Fillet1 2 outline → Fillet1 2 (cut)
    with BuildSketch(Plane(origin=(0, 0, 0), x_dir=(1, 0, 0), z_dir=(0, 1, 0)).offset(FILLET1_START)):
        with BuildLine():
            Line((0, 0), (6.35, 0))
            ThreePointArc((6.35, 0), (1.859871939, 1.859871939), (0, 6.35))
            Line((0, 6.35), (0, 0))
        make_face()
        with BuildLine():
            ThreePointArc((63.5, 6.35), (61.640128061, 1.859871939), (57.15, 0))
            Line((57.15, 0), (63.5, 0))
            Line((63.5, 0), (63.5, 6.35))
        make_face()
    extrude(amount=FILLET1_2_DEPTH, mode=Mode.SUBTRACT)

    # Fillet1 3 outline → Fillet1 3 (cut)
    with BuildSketch(Plane(origin=(0, 0, 0), x_dir=(1, 0, 0), z_dir=(0, 1, 0)).offset(FILLET1_START_2)):
        with BuildLine():
            Line((0, 0), (6.35, 0))
            ThreePointArc((6.35, 0), (1.859871939, 1.859871939), (0, 6.35))
            Line((0, 6.35), (0, 0))
        make_face()
        with BuildLine():
            ThreePointArc((63.5, 6.35), (61.640128061, 1.859871939), (57.15, 0))
            Line((57.15, 0), (63.5, 0))
            Line((63.5, 0), (63.5, 6.35))
        make_face()
    extrude(amount=FILLET1_3_DEPTH, mode=Mode.SUBTRACT)

    # Fillet1 4 outline → Fillet1 4 (cut)
    with BuildSketch(Plane(origin=(0, 0, 0), x_dir=(1, 0, 0), z_dir=(0, 1, 0)).offset(FILLET1_START_2)):
        with BuildLine():
            ThreePointArc((30.765933464, 0.855869565), (31.455375612, 0.439945818), (32.129742513, 0))
            Line((32.129742513, 0), (33.94980387, 0))
            ThreePointArc((33.94980387, 0), (32.301354335, 0.217699116), (30.765933464, 0.855869565))
        make_face()
    extrude(amount=FILLET1_4_DEPTH, mode=Mode.SUBTRACT)

    # Fillet2
    # the kernel refuses this fillet: 2.54 mm, written as the material it takes off along each edge
    with BuildSketch(Plane(origin=(0.476335811, 63.5, -3.937), x_dir=(-0.17728630931640466, 0, -0.9841593186720166), z_dir=(0, -1, 0))) as fillet2_piece_1:
        with BuildLine():
            CenterArc((2.133529901, 2.483365284), FILLET2_R, 190.211734726, 91.910213196)
            Line((-0.366234768, 2.033058059), (0, 0))
            ThreePointArc((0, 0), (1.333456188, -0.141586789), (2.666912377, 0))
        make_face()
    extrude(amount=17.78, mode=Mode.SUBTRACT)


solid = part.part
